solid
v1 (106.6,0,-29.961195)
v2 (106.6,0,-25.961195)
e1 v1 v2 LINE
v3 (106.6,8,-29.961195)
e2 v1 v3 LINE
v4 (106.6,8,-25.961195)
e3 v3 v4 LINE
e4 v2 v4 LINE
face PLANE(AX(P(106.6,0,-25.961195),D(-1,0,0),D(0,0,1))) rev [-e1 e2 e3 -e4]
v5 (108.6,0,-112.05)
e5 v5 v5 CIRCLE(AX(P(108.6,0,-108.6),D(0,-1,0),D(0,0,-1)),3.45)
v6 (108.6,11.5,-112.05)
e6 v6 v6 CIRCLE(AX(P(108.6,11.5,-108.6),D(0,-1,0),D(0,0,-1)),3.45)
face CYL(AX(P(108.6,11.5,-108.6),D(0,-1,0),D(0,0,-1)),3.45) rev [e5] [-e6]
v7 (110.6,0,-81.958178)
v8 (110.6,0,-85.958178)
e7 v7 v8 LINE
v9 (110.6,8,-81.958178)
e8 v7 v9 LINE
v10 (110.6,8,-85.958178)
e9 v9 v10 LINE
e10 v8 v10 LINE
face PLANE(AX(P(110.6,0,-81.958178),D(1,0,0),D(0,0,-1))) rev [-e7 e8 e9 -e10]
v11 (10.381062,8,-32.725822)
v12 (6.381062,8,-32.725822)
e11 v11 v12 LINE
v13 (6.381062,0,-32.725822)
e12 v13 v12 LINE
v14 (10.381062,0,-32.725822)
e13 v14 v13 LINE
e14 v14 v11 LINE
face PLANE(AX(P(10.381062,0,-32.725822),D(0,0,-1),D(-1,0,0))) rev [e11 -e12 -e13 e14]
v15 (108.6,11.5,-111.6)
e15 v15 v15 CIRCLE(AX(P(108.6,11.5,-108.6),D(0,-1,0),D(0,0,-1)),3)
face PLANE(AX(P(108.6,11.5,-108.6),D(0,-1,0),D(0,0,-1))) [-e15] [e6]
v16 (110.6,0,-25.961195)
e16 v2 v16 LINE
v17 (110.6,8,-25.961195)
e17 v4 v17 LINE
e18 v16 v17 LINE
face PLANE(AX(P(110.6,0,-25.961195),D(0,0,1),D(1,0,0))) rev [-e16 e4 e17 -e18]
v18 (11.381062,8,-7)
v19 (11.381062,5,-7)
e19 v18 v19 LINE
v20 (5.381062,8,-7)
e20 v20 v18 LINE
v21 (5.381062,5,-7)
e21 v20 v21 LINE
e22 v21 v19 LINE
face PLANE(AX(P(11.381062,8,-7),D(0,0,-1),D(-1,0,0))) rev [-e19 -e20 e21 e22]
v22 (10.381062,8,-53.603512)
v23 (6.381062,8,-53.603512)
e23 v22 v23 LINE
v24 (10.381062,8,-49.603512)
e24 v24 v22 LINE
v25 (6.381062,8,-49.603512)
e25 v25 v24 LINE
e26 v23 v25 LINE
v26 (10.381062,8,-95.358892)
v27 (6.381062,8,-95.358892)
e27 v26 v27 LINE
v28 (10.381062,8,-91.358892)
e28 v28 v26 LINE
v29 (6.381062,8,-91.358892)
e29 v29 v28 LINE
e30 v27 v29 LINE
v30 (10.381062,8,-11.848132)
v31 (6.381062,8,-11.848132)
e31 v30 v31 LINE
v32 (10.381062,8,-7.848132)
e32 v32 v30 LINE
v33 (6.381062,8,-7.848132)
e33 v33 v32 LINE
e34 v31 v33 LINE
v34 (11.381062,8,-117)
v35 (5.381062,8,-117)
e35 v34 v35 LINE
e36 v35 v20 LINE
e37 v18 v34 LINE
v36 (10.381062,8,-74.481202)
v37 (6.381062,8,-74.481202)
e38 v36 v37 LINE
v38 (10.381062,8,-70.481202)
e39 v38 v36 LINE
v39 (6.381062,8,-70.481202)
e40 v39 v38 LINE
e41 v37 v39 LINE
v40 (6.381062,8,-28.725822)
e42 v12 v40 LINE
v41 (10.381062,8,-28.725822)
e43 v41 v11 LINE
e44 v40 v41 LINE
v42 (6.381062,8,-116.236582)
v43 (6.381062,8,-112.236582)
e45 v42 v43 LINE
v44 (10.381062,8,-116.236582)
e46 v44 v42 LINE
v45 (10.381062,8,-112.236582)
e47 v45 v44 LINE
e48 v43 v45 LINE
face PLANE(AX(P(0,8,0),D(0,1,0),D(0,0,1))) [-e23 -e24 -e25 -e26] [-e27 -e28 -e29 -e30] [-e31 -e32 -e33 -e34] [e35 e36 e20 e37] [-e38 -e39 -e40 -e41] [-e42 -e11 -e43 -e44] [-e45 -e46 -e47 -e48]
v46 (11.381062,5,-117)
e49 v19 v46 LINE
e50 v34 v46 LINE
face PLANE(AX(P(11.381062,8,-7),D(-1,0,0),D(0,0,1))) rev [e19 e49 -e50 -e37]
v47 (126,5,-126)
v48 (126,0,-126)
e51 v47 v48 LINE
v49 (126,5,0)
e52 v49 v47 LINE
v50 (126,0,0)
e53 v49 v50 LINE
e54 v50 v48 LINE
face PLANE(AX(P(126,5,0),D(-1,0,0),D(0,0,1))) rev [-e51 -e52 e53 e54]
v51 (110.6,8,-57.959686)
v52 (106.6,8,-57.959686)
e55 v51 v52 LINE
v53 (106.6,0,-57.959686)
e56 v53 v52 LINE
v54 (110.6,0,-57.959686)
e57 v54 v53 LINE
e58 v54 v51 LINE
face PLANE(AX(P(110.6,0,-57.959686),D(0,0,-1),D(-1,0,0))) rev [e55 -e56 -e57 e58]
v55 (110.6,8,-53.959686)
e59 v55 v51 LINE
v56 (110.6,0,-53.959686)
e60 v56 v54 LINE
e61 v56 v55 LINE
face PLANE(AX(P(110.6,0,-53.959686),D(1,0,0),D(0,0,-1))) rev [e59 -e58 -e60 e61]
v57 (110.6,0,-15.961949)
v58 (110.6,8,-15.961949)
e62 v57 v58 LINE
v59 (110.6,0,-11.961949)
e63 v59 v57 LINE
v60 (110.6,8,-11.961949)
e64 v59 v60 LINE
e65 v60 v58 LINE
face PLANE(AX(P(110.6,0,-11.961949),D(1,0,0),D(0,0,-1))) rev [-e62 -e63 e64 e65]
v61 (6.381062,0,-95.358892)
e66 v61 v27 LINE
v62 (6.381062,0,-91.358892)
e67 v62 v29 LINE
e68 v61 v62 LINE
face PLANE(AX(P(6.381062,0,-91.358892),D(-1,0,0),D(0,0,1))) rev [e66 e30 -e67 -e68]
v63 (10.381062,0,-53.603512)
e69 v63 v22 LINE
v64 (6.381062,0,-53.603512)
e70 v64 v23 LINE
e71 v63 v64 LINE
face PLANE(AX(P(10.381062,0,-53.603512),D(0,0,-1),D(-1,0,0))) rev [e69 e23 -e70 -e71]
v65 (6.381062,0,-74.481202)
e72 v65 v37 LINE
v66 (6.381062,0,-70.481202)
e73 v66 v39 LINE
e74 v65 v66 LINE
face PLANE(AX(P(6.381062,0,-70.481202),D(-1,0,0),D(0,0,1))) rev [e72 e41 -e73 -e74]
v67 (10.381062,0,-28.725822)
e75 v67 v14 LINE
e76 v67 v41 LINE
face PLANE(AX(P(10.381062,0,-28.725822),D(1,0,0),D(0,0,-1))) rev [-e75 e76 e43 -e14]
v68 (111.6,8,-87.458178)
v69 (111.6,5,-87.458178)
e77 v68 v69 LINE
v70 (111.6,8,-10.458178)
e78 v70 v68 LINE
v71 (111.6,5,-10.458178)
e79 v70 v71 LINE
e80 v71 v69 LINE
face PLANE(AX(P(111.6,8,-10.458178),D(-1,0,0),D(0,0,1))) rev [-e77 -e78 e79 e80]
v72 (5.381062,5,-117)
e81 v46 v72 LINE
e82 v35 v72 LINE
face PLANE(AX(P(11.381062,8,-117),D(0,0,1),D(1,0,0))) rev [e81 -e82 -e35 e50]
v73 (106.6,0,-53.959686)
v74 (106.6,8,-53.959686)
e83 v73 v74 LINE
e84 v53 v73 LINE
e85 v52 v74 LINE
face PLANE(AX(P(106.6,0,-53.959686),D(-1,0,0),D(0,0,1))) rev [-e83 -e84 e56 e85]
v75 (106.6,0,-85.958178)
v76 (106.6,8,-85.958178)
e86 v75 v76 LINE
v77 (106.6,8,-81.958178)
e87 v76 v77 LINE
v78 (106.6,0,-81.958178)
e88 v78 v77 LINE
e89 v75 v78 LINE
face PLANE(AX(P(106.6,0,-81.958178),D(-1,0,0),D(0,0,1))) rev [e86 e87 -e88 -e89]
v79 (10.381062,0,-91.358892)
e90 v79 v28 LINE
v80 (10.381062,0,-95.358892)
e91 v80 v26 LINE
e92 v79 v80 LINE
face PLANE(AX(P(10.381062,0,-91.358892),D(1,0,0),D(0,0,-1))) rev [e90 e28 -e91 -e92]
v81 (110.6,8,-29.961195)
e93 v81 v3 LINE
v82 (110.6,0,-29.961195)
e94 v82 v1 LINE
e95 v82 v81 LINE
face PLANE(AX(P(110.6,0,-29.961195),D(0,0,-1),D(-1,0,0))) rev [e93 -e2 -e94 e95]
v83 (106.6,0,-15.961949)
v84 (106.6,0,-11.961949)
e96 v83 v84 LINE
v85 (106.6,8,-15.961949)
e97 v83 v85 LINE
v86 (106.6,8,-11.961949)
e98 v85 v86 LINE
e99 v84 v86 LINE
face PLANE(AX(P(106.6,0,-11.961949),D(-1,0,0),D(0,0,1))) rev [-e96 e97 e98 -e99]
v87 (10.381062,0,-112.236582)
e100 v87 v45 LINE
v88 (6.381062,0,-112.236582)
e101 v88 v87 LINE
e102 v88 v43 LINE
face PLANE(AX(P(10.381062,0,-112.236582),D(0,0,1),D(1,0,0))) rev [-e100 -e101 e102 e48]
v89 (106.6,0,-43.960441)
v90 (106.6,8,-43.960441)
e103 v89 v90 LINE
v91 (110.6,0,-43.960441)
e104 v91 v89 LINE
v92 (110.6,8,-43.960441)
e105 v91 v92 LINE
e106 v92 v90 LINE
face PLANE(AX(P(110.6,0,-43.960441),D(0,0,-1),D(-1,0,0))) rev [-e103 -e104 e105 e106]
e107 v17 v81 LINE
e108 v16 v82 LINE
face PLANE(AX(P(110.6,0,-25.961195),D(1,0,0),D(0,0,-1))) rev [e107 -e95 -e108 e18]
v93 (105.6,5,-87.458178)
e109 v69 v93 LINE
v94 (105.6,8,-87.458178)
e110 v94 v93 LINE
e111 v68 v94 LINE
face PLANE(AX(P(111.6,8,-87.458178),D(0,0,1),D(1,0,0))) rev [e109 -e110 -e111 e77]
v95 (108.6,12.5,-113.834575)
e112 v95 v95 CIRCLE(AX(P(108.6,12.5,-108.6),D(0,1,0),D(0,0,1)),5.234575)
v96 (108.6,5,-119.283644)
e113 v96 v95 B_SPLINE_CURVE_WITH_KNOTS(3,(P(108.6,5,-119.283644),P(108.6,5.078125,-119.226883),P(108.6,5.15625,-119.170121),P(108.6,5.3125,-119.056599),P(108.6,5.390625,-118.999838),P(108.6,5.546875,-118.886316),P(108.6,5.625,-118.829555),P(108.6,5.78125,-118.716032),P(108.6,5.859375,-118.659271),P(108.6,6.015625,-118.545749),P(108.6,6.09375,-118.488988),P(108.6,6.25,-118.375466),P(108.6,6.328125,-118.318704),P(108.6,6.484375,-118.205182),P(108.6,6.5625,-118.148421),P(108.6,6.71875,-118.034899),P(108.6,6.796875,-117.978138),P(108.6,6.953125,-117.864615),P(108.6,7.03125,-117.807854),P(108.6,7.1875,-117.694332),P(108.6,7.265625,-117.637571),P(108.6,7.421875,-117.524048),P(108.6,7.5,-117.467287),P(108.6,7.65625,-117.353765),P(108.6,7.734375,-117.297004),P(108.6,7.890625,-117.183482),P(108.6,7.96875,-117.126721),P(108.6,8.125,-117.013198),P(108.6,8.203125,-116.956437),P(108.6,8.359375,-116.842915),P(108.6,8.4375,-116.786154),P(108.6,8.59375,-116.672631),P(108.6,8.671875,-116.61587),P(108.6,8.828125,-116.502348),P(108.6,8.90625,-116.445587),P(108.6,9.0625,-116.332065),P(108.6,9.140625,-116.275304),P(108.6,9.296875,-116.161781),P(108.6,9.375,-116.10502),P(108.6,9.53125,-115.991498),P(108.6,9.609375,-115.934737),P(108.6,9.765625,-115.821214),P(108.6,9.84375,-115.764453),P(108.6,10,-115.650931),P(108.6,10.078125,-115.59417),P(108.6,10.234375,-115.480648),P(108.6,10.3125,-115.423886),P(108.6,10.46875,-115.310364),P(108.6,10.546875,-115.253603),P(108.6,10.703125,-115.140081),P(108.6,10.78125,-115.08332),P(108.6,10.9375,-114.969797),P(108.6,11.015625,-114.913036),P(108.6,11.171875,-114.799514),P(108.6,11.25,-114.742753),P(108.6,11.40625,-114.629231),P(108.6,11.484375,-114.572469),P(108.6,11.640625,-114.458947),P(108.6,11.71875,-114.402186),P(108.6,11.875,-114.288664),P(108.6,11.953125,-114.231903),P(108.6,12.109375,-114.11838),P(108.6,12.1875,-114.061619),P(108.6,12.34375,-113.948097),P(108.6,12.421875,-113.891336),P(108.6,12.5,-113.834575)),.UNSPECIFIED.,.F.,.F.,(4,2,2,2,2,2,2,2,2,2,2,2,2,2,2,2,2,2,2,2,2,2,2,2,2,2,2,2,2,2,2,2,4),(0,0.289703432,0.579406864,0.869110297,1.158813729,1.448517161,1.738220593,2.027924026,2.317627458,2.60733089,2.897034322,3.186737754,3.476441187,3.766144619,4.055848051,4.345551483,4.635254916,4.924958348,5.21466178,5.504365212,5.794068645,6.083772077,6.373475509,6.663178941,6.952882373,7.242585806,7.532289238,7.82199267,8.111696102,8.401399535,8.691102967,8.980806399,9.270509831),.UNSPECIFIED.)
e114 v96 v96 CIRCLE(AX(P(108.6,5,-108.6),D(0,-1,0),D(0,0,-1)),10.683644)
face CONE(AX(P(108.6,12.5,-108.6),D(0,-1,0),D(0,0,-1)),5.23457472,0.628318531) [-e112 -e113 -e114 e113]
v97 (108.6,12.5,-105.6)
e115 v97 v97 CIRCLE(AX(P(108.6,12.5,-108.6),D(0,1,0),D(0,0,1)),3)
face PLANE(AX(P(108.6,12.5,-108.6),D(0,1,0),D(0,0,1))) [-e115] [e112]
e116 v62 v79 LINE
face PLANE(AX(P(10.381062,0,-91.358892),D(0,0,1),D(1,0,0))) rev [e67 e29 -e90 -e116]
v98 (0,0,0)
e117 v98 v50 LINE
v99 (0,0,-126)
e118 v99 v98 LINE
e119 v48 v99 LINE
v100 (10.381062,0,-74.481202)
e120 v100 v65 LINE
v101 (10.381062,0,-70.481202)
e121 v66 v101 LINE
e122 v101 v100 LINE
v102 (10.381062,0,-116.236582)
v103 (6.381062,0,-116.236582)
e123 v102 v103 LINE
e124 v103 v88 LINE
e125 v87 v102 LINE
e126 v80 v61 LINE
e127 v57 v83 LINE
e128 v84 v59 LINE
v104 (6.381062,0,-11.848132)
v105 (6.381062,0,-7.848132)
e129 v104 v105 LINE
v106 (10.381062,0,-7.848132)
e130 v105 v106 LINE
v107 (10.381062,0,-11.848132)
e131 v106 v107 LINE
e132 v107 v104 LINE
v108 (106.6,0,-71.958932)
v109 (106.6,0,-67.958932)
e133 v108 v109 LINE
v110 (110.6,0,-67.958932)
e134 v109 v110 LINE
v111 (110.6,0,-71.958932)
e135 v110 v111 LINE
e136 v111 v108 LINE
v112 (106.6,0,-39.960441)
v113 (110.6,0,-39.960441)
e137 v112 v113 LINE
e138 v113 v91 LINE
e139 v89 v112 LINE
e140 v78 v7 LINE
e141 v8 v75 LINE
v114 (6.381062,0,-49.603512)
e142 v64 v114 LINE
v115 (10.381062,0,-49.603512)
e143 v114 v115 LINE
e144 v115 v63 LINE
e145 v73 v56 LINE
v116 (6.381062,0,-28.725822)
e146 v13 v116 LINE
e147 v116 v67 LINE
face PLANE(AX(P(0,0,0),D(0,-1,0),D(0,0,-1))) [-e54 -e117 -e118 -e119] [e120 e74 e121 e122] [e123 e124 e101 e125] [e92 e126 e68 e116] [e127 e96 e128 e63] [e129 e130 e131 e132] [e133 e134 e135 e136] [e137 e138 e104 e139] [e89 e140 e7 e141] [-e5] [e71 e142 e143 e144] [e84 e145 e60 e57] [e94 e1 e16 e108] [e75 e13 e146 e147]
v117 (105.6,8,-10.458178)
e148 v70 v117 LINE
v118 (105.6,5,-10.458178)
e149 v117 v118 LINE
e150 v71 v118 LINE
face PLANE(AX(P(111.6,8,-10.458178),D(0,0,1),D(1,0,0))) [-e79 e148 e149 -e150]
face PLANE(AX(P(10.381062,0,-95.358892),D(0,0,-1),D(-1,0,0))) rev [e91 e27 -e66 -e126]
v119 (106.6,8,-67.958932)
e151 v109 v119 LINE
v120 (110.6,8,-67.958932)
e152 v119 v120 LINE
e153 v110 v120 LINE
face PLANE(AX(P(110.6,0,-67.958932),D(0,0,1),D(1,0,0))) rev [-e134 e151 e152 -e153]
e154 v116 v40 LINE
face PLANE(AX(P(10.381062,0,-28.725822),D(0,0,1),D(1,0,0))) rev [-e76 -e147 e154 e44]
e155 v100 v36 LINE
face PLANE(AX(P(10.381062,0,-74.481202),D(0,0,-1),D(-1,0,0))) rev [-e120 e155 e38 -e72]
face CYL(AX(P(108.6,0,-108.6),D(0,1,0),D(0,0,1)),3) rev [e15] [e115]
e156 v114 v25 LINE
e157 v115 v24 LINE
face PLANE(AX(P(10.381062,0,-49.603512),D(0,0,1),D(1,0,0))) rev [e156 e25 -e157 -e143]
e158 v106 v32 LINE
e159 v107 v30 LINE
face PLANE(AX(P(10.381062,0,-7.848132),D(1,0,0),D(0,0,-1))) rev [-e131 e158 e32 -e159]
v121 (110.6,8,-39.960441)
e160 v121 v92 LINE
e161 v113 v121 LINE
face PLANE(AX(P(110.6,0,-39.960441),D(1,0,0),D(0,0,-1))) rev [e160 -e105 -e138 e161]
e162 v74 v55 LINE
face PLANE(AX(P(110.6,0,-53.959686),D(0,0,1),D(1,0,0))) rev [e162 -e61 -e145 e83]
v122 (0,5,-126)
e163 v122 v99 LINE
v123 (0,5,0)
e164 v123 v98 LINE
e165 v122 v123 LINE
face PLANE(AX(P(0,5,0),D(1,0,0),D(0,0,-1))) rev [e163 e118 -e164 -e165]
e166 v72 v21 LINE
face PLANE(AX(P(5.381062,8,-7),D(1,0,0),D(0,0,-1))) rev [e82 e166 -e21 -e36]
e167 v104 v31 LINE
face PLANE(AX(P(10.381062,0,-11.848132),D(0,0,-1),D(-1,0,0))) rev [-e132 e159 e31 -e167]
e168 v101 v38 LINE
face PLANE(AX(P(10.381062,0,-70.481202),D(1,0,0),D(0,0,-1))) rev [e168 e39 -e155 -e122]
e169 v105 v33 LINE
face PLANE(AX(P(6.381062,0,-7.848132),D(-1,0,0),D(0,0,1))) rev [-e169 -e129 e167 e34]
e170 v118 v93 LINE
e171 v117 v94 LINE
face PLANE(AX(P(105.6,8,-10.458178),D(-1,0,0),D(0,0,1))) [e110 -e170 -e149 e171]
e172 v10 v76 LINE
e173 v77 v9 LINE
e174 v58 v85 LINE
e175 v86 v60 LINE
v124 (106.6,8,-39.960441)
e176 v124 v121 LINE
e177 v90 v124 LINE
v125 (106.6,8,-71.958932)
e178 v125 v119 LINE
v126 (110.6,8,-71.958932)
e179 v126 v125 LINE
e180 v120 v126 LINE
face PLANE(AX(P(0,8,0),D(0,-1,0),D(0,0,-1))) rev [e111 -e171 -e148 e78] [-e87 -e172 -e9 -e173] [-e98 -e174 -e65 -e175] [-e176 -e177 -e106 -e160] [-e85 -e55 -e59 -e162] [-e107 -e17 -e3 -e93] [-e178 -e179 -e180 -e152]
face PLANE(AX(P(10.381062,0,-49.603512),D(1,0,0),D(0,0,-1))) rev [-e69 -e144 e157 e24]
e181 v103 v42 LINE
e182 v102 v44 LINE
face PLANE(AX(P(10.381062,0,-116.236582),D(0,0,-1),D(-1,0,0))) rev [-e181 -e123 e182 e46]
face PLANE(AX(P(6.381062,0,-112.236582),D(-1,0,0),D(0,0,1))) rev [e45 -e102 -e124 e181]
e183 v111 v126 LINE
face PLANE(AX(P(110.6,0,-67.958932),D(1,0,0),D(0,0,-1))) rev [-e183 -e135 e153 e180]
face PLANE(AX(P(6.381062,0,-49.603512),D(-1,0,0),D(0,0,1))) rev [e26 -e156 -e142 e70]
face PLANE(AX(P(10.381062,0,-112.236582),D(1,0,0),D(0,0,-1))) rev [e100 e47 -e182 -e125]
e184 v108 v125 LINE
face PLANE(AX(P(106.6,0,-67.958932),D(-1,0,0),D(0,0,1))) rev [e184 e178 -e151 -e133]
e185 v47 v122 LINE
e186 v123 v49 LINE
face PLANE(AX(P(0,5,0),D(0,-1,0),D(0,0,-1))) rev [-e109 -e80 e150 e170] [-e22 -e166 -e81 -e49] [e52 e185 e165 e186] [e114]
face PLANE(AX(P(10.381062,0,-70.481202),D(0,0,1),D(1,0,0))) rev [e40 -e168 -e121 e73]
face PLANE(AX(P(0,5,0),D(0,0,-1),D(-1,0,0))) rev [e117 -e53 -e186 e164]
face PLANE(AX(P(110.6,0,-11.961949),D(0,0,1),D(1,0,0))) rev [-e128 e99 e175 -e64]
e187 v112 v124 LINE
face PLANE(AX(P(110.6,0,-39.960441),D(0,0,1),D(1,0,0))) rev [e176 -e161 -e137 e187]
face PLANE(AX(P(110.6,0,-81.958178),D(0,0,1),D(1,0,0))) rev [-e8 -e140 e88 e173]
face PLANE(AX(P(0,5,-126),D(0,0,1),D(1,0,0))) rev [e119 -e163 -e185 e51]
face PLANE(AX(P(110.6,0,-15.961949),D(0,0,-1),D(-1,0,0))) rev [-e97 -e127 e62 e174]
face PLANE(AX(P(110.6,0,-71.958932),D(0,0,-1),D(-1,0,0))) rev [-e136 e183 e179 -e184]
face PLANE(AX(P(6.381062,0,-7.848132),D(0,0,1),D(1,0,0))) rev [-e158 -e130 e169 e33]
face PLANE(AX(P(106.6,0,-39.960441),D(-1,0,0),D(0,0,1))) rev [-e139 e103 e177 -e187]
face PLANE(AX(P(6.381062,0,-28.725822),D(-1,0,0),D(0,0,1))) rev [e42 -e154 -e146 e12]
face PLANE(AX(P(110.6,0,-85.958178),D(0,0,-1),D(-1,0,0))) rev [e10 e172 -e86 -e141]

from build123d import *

# Parameters (mm, degrees)
SKETCH1_W           = 126
SKETCH1_H           = 126
BOSS_EXTRUDE1_DEPTH = 5
SKETCH3_R           = 12.5
BOSS_EXTRUDE2_DEPTH = 7.5
SKETCH4_R           = 3.45
CUT_EXTRUDE1_DEPTH  = 11.5
SKETCH6_R           = 3
CUT_EXTRUDE2_DEPTH  = 179.628805068
CHAMFER1_SIZE       = 10
CHAMFER1_SIZE_2     = 7.26542528
SKETCH9_W           = 6
SKETCH9_H           = 77
BOSS_EXTRUDE4_DEPTH = 3
SKETCH10_W          = 4
SKETCH10_H          = 4
CUT_EXTRUDE4_DEPTH  = 179.370401132
SKETCH11_W          = 6
SKETCH11_H          = 110
BOSS_EXTRUDE5_DEPTH = 3
SKETCH12_W          = 4
SKETCH12_H          = 4
CUT_EXTRUDE5_DEPTH  = 179.370401132


with BuildPart() as part:
    # Sketch1 → Boss-Extrude1 (new body)
    with BuildSketch(Plane(origin=(0, 0, 0), x_dir=(1, 0, 0), z_dir=(0, 1, 0))):
        with Locations((63, 63)):
            Rectangle(SKETCH1_W, SKETCH1_H)
    extrude(amount=BOSS_EXTRUDE1_DEPTH)

    # Sketch3 → Boss-Extrude2 (add)
    with BuildSketch(Plane(origin=(0, 5, 0), x_dir=(1, 0, 0), z_dir=(0, 1, 0))):
        with Locations(Location((108.6, 108.6, 0), (0, 0, 90))):
            Circle(SKETCH3_R)
    extrude(amount=BOSS_EXTRUDE2_DEPTH)

    # Sketch4 → Cut-Extrude1 (cut)
    with BuildSketch(Plane.XZ):
        with Locations(Location((108.6, -108.6, 0), (0, 0, 270))):
            Circle(SKETCH4_R)
    extrude(amount=-CUT_EXTRUDE1_DEPTH, mode=Mode.SUBTRACT)

    # Sketch6 → Cut-Extrude2 (cut, through all)
    with BuildSketch(Plane(origin=(0, 12.5, 0), x_dir=(1, 0, 0), z_dir=(0, 1, 0))):
        with Locations(Location((108.6, 108.6, 0), (0, 0, 270))):
            Circle(SKETCH6_R)
    extrude(amount=-CUT_EXTRUDE2_DEPTH, mode=Mode.SUBTRACT)

    # Chamfer1
    # the kernel refuses this chamfer: 10, 7.26542528 mm, written as the material it takes off along each edge
    with BuildSketch(Plane(origin=(108.6, 12.5, -108.6), x_dir=(0, 0, -1), z_dir=(1, 0, 0))) as chamfer1_piece_1_section:
        Polygon((12.5, -CHAMFER1_SIZE), (12.5 - CHAMFER1_SIZE_2, 0), (12.5, 0), align=None)
    chamfer1_piece_1 = revolve(axis=Axis((108.6, 12.5, -108.6), (0, 1, 0)), mode=Mode.PRIVATE)
    chamfer1_piece_1 = split(chamfer1_piece_1, bisect_by=Plane(origin=(108.6, 5, -100.650989912), z_dir=(0, 1, 0)), keep=Keep.TOP, mode=Mode.PRIVATE)
    add(chamfer1_piece_1, mode=Mode.SUBTRACT)

    # Sketch9 → Boss-Extrude4 (add)
    with BuildSketch(Plane(origin=(0, 5, 0), x_dir=(1, 0, 0), z_dir=(0, 1, 0))):
        with Locations((108.6, 48.95817816)):
            Rectangle(SKETCH9_W, SKETCH9_H)
    extrude(amount=BOSS_EXTRUDE4_DEPTH)

    # Sketch10 → Cut-Extrude4 (cut, through all)
    with BuildSketch(Plane(origin=(0, 8, 0), x_dir=(1, 0, 0), z_dir=(0, 1, 0))):
        with Locations((108.6, 83.95817816)):
            Rectangle(SKETCH10_W, SKETCH10_H)
        with Locations((108.6, 69.958932274)):
            Rectangle(SKETCH10_W, SKETCH10_H)
        with Locations((108.6, 55.959686388)):
            Rectangle(SKETCH10_W, SKETCH10_H)
        with Locations((108.6, 41.960440502)):
            Rectangle(SKETCH10_W, SKETCH10_H)
        with Locations((108.6, 27.961194616)):
            Rectangle(SKETCH10_W, SKETCH10_H)
        with Locations((108.6, 13.96194873)):
            Rectangle(SKETCH10_W, SKETCH10_H)
    extrude(amount=-CUT_EXTRUDE4_DEPTH, mode=Mode.SUBTRACT)

    # Sketch11 → Boss-Extrude5 (add)
    with BuildSketch(Plane(origin=(0, 5, 0), x_dir=(1, 0, 0), z_dir=(0, 1, 0))):
        with Locations((8.381061813, 62)):
            Rectangle(SKETCH11_W, SKETCH11_H)
    extrude(amount=BOSS_EXTRUDE5_DEPTH)

    # Sketch12 → Cut-Extrude5 (cut, through all)
    with BuildSketch(Plane(origin=(0, 8, 0), x_dir=(1, 0, 0), z_dir=(0, 1, 0))):
        with Locations((8.381061813, 114.236582212)):
            Rectangle(SKETCH12_W, SKETCH12_H)
        with Locations((8.381061813, 93.358892092)):
            Rectangle(SKETCH12_W, SKETCH12_H)
        with Locations((8.381061813, 72.481201972)):
            Rectangle(SKETCH12_W, SKETCH12_H)
        with Locations((8.381061813, 51.603511852)):
            Rectangle(SKETCH12_W, SKETCH12_H)
        with Locations((8.381061813, 30.725821731)):
            Rectangle(SKETCH12_W, SKETCH12_H)
        with Locations((8.381061813, 9.848131611)):
            Rectangle(SKETCH12_W, SKETCH12_H)
    extrude(amount=-CUT_EXTRUDE5_DEPTH, mode=Mode.SUBTRACT)


solid = part.part
